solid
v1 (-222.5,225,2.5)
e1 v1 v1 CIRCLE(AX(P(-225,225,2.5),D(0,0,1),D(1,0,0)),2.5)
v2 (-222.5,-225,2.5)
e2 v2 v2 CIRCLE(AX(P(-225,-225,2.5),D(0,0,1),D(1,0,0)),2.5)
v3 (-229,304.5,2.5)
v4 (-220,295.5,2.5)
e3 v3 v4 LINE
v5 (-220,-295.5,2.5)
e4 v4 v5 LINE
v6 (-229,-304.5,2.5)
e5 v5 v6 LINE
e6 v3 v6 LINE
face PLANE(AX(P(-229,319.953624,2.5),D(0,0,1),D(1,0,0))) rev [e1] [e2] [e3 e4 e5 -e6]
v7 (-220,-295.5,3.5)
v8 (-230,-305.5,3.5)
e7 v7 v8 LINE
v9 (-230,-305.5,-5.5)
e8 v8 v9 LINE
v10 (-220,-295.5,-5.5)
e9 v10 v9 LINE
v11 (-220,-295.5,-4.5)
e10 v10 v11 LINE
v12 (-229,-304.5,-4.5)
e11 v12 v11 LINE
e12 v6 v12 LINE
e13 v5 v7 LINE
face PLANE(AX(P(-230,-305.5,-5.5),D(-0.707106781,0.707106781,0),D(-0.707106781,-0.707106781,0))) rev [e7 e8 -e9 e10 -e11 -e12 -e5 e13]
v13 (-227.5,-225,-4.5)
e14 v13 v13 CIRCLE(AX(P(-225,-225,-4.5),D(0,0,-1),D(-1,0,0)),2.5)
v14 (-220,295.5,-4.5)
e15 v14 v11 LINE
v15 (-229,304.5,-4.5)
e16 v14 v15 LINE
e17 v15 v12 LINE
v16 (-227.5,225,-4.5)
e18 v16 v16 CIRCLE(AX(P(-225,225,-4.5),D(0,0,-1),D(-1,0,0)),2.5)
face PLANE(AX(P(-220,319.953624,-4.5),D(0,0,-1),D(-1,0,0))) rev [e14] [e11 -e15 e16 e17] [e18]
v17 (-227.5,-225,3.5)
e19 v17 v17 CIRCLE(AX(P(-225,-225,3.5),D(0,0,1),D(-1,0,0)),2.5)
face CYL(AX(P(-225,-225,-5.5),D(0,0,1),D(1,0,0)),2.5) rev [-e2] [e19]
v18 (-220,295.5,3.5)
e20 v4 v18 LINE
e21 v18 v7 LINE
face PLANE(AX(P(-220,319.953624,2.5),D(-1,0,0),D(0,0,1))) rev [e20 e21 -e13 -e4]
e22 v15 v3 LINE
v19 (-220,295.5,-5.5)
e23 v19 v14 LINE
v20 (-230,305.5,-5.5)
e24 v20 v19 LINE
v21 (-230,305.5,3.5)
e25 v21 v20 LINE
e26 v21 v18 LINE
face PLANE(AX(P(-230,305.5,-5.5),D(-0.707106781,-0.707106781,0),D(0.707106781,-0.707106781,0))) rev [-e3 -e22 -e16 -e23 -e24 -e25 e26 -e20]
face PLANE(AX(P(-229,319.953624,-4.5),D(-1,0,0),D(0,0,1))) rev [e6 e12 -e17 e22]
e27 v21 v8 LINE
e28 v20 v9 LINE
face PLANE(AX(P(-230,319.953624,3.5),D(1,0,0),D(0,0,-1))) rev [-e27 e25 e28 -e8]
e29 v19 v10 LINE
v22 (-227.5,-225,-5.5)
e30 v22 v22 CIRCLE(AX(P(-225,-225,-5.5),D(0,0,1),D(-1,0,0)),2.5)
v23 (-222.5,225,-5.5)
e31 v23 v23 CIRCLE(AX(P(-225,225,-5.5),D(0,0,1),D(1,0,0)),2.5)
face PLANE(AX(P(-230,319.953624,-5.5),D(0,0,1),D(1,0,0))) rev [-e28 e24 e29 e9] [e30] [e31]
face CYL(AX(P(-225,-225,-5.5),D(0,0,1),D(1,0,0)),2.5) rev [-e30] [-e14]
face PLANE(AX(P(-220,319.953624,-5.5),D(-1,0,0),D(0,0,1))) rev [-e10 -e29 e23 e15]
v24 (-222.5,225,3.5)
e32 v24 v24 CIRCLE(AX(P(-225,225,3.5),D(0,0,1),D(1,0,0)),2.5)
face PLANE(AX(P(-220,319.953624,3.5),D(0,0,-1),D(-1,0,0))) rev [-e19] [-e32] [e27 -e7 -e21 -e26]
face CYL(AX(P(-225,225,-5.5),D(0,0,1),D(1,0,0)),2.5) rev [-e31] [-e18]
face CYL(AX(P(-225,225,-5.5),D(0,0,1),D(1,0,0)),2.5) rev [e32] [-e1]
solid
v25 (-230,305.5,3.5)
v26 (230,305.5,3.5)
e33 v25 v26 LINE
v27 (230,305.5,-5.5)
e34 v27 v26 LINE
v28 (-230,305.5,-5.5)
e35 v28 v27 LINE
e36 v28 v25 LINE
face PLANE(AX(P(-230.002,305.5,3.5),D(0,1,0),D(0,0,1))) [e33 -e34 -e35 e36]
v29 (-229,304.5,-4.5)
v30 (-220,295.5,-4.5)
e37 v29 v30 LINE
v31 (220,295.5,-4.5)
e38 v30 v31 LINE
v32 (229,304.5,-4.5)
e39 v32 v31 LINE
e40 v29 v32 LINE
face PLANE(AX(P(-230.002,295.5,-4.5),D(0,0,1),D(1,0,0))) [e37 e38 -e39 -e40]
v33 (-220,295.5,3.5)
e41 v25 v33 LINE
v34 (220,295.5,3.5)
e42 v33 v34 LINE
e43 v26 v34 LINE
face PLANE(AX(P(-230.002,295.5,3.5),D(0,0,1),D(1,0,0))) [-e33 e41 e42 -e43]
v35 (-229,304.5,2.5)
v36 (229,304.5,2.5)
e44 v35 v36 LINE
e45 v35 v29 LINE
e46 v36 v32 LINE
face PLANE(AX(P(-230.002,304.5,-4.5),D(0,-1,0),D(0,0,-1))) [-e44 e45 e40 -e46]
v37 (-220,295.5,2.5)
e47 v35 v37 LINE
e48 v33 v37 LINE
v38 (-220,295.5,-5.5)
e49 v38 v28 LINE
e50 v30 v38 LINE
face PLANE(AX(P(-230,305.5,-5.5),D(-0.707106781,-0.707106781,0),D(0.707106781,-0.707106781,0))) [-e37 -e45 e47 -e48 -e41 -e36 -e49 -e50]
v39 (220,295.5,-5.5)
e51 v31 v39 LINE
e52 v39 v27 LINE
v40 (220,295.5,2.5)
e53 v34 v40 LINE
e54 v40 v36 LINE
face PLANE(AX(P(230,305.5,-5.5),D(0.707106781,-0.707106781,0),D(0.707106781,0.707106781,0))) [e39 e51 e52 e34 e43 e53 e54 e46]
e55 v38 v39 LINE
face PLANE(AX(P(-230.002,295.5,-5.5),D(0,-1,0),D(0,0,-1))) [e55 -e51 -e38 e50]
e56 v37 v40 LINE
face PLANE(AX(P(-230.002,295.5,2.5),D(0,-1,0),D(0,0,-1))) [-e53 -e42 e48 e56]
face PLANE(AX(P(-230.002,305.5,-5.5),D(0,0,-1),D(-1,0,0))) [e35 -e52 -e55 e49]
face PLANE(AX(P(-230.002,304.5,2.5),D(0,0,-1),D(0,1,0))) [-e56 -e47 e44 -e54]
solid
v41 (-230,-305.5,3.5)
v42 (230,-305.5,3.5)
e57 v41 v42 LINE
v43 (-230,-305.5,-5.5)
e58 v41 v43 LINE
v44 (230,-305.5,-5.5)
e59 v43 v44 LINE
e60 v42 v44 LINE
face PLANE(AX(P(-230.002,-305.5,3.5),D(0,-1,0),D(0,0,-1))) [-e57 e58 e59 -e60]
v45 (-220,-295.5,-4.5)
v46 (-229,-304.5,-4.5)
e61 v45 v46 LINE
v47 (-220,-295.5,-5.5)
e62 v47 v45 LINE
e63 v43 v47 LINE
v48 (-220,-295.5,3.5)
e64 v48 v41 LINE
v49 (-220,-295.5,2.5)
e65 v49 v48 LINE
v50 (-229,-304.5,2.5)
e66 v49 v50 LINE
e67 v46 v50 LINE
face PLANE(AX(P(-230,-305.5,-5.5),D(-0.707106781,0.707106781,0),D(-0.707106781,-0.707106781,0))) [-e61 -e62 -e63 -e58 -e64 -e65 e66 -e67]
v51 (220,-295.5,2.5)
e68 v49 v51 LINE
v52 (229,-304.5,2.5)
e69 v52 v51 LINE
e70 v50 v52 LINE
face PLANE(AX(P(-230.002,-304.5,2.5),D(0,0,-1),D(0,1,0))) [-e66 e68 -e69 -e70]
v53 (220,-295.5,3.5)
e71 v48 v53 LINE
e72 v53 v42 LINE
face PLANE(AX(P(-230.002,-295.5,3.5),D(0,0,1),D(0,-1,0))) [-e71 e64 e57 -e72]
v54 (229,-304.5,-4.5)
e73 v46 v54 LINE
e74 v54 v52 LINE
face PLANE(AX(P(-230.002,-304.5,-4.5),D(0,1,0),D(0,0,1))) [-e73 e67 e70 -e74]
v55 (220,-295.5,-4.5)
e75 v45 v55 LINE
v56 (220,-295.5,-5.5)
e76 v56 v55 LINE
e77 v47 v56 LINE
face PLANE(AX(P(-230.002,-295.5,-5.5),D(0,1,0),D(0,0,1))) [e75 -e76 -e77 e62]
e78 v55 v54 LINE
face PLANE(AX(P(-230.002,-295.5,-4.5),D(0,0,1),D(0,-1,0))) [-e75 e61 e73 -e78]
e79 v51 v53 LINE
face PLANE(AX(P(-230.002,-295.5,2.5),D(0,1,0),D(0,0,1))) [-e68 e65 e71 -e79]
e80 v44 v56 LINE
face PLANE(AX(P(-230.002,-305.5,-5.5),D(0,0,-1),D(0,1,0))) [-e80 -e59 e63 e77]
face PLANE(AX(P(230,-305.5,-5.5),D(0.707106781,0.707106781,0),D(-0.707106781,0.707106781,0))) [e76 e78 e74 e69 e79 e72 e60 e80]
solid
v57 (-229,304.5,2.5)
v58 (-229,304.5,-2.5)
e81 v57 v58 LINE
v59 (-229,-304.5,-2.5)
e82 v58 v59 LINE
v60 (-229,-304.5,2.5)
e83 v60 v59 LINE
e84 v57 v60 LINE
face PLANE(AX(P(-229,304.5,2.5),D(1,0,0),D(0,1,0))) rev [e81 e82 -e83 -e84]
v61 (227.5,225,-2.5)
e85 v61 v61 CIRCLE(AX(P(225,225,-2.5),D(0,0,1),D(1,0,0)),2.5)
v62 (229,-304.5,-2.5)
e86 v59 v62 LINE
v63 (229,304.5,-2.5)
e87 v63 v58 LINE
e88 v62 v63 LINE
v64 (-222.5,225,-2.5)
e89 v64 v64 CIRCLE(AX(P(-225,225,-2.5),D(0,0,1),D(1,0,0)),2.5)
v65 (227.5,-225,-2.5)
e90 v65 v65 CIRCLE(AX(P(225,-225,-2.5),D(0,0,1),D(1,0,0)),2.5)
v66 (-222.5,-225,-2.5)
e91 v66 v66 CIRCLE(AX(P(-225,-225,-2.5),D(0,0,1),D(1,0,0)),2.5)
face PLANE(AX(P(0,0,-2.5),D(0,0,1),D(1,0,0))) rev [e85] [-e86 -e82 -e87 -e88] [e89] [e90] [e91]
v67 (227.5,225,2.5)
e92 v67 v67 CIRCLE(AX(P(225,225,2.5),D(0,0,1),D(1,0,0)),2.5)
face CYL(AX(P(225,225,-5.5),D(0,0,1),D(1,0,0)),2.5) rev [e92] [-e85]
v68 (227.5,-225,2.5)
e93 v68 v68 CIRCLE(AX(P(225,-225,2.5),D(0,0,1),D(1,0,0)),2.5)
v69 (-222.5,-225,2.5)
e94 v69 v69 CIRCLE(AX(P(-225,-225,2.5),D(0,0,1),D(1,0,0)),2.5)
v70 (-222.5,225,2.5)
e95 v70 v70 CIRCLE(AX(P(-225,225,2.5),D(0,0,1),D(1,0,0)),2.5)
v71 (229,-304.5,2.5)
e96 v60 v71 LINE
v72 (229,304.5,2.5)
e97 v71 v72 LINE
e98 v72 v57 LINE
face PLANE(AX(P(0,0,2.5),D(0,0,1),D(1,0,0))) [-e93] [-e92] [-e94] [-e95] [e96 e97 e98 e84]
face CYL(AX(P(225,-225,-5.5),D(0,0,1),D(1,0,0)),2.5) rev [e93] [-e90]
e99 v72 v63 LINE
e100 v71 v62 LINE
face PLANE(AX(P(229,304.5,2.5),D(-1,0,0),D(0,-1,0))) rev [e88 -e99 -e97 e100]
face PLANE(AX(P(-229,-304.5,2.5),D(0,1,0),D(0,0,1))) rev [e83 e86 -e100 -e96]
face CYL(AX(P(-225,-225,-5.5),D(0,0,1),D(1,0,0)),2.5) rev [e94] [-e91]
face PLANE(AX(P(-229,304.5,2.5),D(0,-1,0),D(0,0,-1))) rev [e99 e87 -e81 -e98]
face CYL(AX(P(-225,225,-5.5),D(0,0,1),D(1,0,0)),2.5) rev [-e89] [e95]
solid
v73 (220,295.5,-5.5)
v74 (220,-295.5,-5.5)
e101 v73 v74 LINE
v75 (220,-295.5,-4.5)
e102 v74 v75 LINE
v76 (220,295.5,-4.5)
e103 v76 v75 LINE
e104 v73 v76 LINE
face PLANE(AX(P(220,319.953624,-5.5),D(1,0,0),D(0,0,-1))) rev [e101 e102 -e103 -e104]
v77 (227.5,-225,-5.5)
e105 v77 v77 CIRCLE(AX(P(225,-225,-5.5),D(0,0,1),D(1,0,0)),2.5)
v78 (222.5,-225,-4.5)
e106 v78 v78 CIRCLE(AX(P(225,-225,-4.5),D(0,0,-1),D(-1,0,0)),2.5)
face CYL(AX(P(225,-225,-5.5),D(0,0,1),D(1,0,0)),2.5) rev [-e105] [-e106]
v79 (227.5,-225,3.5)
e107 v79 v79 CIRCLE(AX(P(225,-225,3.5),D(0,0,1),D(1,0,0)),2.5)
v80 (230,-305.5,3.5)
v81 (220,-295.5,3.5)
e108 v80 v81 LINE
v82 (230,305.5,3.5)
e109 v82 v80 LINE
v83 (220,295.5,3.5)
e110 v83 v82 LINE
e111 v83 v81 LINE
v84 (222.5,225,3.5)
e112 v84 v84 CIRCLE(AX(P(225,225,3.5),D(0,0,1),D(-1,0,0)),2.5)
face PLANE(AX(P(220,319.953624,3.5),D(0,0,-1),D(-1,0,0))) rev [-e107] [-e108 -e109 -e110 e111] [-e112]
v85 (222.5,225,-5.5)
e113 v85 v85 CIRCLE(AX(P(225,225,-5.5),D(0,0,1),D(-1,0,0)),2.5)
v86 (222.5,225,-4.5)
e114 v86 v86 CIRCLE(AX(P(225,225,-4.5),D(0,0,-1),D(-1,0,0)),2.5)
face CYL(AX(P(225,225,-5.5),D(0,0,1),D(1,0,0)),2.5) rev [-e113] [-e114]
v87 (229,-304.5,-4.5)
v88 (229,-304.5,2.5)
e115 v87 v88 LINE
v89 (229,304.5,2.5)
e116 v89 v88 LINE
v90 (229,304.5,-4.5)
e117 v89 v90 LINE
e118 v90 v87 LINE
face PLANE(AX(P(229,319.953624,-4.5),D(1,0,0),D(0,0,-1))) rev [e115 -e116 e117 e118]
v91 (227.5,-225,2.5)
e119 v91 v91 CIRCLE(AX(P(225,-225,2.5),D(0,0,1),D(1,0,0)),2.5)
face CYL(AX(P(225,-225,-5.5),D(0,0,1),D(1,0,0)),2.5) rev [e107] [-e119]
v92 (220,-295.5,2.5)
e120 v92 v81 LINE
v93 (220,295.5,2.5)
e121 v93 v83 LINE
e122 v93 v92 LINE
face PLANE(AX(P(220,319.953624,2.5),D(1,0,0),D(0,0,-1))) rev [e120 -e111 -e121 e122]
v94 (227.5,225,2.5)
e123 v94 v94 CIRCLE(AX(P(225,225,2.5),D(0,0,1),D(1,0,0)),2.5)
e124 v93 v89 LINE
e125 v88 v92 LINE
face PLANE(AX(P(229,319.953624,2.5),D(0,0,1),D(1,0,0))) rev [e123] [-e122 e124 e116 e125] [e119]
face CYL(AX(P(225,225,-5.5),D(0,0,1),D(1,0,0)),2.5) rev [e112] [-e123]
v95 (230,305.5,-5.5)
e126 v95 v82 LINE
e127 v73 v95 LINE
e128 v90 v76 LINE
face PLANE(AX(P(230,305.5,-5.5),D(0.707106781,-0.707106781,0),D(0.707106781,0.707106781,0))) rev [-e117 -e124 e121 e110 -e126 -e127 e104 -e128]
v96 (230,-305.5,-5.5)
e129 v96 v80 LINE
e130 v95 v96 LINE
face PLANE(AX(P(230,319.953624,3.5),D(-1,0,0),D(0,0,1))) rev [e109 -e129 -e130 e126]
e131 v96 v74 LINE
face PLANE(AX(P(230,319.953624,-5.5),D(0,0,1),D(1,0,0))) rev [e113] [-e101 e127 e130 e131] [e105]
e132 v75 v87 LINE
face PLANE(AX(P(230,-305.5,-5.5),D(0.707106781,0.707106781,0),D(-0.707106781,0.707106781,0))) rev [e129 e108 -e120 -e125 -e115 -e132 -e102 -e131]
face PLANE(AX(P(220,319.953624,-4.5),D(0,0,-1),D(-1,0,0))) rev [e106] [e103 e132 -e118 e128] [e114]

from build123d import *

# Parameters (mm, degrees)
SKETCH1_W                  = 458
SKETCH1_H                  = 609
BOSS_EXTRUDE1_DEPTH        = 2.5
BOSS_EXTRUDE2_DEPTH        = 305.5
BOSS_EXTRUDE2_DEPTH_BACK   = 305.5
BOSS_EXTRUDE2_2_DEPTH      = 305.5
BOSS_EXTRUDE2_2_DEPTH_BACK = 305.5
CUT_EXTRUDE1_DEPTH         = 383.440191403
CUT_EXTRUDE1_DEPTH_BACK    = 383.440191403
BOSS_EXTRUDE3_START        = -5.5
BOSS_EXTRUDE3_DEPTH        = 1
BOSS_EXTRUDE3_START_2      = 2.5
BOSS_EXTRUDE3_2_DEPTH      = 1
BOSS_EXTRUDE3_START_3      = -4.5
BOSS_EXTRUDE3_3_DEPTH      = 7
BOSS_EXTRUDE3_4_DEPTH      = 1
BOSS_EXTRUDE3_5_DEPTH      = 1
BOSS_EXTRUDE3_6_DEPTH      = 7
CUT_EXTRUDE2_DEPTH         = 383.440191403
CUT_EXTRUDE2_DEPTH_BACK    = 383.440191403
SKETCH5_R                  = 2.5


# Read off the part's stored shape, not the designer's step: Boss-Extrude3
with BuildPart() as part:
    # Sketch1 → Boss-Extrude1 (new, symmetric)
    with BuildSketch(Plane.XY):
        Rectangle(SKETCH1_W, SKETCH1_H)
    extrude(amount=BOSS_EXTRUDE1_DEPTH, both=True)


with BuildPart() as body_2:
    # Sketch2 → Boss-Extrude2 (new, two sides: drawn at the far end of the back side and taken through both)
    with BuildSketch(Plane(origin=(0, 0, 0), x_dir=(1, 0, 0), z_dir=(0, 1, 0)).offset(-BOSS_EXTRUDE2_DEPTH_BACK)):
        Polygon((-229, -2.5), (-220, -2.5), (-220, -3.5), (-230, -3.5), (-230, 5.5), (-220, 5.5), (-220, 4.5), (-229, 4.5), align=None)
    extrude(amount=BOSS_EXTRUDE2_DEPTH + BOSS_EXTRUDE2_DEPTH_BACK)


with BuildPart() as body_3:
    # Sketch2 → Boss-Extrude2 2 (new, two sides: drawn at the far end of the back side and taken through both)
    with BuildSketch(Plane(origin=(0, 0, 0), x_dir=(1, 0, 0), z_dir=(0, 1, 0)).offset(-BOSS_EXTRUDE2_2_DEPTH_BACK)):
        Polygon((229, 4.5), (229, -2.5), (220, -2.5), (220, -3.5), (230, -3.5), (230, 5.5), (220, 5.5), (220, 4.5), align=None)
    extrude(amount=BOSS_EXTRUDE2_2_DEPTH + BOSS_EXTRUDE2_2_DEPTH_BACK)


with BuildPart() as cut_extrude1_tool:
    # Sketch3 → Cut-Extrude1 (new, two sides: drawn at the far end of the back side and taken through both)
    with BuildSketch(Plane.XY.offset(-CUT_EXTRUDE1_DEPTH_BACK)):
        Polygon((-230, 305.5), (-220, 295.5), (-220, 305.5), align=None)
        Polygon((220, 305.5), (230, 305.5), (220, 295.5), align=None)
        Polygon((230, -305.5), (220, -295.5), (220, -305.5), align=None)
        Polygon((-220, -305.5), (-230, -305.5), (-220, -295.5), align=None)
    extrude(amount=CUT_EXTRUDE1_DEPTH + CUT_EXTRUDE1_DEPTH_BACK)


with BuildPart() as body_2_1:
    add(body_2.part)

    # Cut-Extrude1: cut by cut_extrude1_tool
    add(cut_extrude1_tool.part, mode=Mode.SUBTRACT)


with BuildPart() as body_3_1:
    add(body_3.part)

    # Cut-Extrude1: cut by cut_extrude1_tool
    add(cut_extrude1_tool.part, mode=Mode.SUBTRACT)


with BuildPart() as body_4:
    # Boss-Extrude3 outline → Boss-Extrude3 (new body)
    with BuildSketch(Plane.XY.offset(BOSS_EXTRUDE3_START)):
        Polygon((220, -295.5), (-220, -295.5), (-230, -305.5), (230, -305.5), align=None)
    extrude(amount=BOSS_EXTRUDE3_DEPTH)

    # Boss-Extrude3 2 outline → Boss-Extrude3 2 (add)
    with BuildSketch(Plane.XY.offset(BOSS_EXTRUDE3_START_2)):
        Polygon((220, -295.5), (-220, -295.5), (-230, -305.5), (230, -305.5), align=None)
    extrude(amount=BOSS_EXTRUDE3_2_DEPTH)

    # Boss-Extrude3 3 outline → Boss-Extrude3 3 (add)
    with BuildSketch(Plane.XY.offset(BOSS_EXTRUDE3_START_3)):
        Polygon((229, -304.5), (-229, -304.5), (-230, -305.5), (230, -305.5), align=None)
    extrude(amount=BOSS_EXTRUDE3_3_DEPTH)


with BuildPart() as body_5:
    # Boss-Extrude3 4 outline → Boss-Extrude3 4 (new body)
    with BuildSketch(Plane.XY.offset(BOSS_EXTRUDE3_START)):
        Polygon((230, 305.5), (-230, 305.5), (-220, 295.5), (220, 295.5), align=None)
    extrude(amount=BOSS_EXTRUDE3_4_DEPTH)

    # Boss-Extrude3 5 outline → Boss-Extrude3 5 (add)
    with BuildSketch(Plane.XY.offset(BOSS_EXTRUDE3_START_2)):
        Polygon((230, 305.5), (-230, 305.5), (-220, 295.5), (220, 295.5), align=None)
    extrude(amount=BOSS_EXTRUDE3_5_DEPTH)

    # Boss-Extrude3 6 outline → Boss-Extrude3 6 (add)
    with BuildSketch(Plane.XY.offset(BOSS_EXTRUDE3_START_3)):
        Polygon((230, 305.5), (-230, 305.5), (-229, 304.5), (229, 304.5), align=None)
    extrude(amount=BOSS_EXTRUDE3_6_DEPTH)


with BuildPart() as cut_extrude2_tool:
    # Sketch5 → Cut-Extrude2 (new, two sides: drawn at the far end of the back side and taken through both)
    with BuildSketch(Plane.XY.offset(-CUT_EXTRUDE2_DEPTH_BACK)):
        with Locations((-225, 225)):
            Circle(SKETCH5_R)
        with Locations(Location((-225, -225, 0), (0, 0, 180))):
            Circle(SKETCH5_R)
        with Locations((225, -225)):
            Circle(SKETCH5_R)
        with Locations(Location((225, 225, 0), (0, 0, 180))):
            Circle(SKETCH5_R)
    extrude(amount=CUT_EXTRUDE2_DEPTH + CUT_EXTRUDE2_DEPTH_BACK)


with BuildPart() as part_1:
    add(part.part)

    # Cut-Extrude2: cut by cut_extrude2_tool
    add(cut_extrude2_tool.part, mode=Mode.SUBTRACT)


with BuildPart() as body_2_2:
    add(body_2_1.part)

    # Cut-Extrude2: cut by cut_extrude2_tool
    add(cut_extrude2_tool.part, mode=Mode.SUBTRACT)


with BuildPart() as body_3_2:
    add(body_3_1.part)

    # Cut-Extrude2: cut by cut_extrude2_tool
    add(cut_extrude2_tool.part, mode=Mode.SUBTRACT)


solid = Compound([body_4.part, body_5.part, part_1.part, body_2_2.part, body_3_2.part])
